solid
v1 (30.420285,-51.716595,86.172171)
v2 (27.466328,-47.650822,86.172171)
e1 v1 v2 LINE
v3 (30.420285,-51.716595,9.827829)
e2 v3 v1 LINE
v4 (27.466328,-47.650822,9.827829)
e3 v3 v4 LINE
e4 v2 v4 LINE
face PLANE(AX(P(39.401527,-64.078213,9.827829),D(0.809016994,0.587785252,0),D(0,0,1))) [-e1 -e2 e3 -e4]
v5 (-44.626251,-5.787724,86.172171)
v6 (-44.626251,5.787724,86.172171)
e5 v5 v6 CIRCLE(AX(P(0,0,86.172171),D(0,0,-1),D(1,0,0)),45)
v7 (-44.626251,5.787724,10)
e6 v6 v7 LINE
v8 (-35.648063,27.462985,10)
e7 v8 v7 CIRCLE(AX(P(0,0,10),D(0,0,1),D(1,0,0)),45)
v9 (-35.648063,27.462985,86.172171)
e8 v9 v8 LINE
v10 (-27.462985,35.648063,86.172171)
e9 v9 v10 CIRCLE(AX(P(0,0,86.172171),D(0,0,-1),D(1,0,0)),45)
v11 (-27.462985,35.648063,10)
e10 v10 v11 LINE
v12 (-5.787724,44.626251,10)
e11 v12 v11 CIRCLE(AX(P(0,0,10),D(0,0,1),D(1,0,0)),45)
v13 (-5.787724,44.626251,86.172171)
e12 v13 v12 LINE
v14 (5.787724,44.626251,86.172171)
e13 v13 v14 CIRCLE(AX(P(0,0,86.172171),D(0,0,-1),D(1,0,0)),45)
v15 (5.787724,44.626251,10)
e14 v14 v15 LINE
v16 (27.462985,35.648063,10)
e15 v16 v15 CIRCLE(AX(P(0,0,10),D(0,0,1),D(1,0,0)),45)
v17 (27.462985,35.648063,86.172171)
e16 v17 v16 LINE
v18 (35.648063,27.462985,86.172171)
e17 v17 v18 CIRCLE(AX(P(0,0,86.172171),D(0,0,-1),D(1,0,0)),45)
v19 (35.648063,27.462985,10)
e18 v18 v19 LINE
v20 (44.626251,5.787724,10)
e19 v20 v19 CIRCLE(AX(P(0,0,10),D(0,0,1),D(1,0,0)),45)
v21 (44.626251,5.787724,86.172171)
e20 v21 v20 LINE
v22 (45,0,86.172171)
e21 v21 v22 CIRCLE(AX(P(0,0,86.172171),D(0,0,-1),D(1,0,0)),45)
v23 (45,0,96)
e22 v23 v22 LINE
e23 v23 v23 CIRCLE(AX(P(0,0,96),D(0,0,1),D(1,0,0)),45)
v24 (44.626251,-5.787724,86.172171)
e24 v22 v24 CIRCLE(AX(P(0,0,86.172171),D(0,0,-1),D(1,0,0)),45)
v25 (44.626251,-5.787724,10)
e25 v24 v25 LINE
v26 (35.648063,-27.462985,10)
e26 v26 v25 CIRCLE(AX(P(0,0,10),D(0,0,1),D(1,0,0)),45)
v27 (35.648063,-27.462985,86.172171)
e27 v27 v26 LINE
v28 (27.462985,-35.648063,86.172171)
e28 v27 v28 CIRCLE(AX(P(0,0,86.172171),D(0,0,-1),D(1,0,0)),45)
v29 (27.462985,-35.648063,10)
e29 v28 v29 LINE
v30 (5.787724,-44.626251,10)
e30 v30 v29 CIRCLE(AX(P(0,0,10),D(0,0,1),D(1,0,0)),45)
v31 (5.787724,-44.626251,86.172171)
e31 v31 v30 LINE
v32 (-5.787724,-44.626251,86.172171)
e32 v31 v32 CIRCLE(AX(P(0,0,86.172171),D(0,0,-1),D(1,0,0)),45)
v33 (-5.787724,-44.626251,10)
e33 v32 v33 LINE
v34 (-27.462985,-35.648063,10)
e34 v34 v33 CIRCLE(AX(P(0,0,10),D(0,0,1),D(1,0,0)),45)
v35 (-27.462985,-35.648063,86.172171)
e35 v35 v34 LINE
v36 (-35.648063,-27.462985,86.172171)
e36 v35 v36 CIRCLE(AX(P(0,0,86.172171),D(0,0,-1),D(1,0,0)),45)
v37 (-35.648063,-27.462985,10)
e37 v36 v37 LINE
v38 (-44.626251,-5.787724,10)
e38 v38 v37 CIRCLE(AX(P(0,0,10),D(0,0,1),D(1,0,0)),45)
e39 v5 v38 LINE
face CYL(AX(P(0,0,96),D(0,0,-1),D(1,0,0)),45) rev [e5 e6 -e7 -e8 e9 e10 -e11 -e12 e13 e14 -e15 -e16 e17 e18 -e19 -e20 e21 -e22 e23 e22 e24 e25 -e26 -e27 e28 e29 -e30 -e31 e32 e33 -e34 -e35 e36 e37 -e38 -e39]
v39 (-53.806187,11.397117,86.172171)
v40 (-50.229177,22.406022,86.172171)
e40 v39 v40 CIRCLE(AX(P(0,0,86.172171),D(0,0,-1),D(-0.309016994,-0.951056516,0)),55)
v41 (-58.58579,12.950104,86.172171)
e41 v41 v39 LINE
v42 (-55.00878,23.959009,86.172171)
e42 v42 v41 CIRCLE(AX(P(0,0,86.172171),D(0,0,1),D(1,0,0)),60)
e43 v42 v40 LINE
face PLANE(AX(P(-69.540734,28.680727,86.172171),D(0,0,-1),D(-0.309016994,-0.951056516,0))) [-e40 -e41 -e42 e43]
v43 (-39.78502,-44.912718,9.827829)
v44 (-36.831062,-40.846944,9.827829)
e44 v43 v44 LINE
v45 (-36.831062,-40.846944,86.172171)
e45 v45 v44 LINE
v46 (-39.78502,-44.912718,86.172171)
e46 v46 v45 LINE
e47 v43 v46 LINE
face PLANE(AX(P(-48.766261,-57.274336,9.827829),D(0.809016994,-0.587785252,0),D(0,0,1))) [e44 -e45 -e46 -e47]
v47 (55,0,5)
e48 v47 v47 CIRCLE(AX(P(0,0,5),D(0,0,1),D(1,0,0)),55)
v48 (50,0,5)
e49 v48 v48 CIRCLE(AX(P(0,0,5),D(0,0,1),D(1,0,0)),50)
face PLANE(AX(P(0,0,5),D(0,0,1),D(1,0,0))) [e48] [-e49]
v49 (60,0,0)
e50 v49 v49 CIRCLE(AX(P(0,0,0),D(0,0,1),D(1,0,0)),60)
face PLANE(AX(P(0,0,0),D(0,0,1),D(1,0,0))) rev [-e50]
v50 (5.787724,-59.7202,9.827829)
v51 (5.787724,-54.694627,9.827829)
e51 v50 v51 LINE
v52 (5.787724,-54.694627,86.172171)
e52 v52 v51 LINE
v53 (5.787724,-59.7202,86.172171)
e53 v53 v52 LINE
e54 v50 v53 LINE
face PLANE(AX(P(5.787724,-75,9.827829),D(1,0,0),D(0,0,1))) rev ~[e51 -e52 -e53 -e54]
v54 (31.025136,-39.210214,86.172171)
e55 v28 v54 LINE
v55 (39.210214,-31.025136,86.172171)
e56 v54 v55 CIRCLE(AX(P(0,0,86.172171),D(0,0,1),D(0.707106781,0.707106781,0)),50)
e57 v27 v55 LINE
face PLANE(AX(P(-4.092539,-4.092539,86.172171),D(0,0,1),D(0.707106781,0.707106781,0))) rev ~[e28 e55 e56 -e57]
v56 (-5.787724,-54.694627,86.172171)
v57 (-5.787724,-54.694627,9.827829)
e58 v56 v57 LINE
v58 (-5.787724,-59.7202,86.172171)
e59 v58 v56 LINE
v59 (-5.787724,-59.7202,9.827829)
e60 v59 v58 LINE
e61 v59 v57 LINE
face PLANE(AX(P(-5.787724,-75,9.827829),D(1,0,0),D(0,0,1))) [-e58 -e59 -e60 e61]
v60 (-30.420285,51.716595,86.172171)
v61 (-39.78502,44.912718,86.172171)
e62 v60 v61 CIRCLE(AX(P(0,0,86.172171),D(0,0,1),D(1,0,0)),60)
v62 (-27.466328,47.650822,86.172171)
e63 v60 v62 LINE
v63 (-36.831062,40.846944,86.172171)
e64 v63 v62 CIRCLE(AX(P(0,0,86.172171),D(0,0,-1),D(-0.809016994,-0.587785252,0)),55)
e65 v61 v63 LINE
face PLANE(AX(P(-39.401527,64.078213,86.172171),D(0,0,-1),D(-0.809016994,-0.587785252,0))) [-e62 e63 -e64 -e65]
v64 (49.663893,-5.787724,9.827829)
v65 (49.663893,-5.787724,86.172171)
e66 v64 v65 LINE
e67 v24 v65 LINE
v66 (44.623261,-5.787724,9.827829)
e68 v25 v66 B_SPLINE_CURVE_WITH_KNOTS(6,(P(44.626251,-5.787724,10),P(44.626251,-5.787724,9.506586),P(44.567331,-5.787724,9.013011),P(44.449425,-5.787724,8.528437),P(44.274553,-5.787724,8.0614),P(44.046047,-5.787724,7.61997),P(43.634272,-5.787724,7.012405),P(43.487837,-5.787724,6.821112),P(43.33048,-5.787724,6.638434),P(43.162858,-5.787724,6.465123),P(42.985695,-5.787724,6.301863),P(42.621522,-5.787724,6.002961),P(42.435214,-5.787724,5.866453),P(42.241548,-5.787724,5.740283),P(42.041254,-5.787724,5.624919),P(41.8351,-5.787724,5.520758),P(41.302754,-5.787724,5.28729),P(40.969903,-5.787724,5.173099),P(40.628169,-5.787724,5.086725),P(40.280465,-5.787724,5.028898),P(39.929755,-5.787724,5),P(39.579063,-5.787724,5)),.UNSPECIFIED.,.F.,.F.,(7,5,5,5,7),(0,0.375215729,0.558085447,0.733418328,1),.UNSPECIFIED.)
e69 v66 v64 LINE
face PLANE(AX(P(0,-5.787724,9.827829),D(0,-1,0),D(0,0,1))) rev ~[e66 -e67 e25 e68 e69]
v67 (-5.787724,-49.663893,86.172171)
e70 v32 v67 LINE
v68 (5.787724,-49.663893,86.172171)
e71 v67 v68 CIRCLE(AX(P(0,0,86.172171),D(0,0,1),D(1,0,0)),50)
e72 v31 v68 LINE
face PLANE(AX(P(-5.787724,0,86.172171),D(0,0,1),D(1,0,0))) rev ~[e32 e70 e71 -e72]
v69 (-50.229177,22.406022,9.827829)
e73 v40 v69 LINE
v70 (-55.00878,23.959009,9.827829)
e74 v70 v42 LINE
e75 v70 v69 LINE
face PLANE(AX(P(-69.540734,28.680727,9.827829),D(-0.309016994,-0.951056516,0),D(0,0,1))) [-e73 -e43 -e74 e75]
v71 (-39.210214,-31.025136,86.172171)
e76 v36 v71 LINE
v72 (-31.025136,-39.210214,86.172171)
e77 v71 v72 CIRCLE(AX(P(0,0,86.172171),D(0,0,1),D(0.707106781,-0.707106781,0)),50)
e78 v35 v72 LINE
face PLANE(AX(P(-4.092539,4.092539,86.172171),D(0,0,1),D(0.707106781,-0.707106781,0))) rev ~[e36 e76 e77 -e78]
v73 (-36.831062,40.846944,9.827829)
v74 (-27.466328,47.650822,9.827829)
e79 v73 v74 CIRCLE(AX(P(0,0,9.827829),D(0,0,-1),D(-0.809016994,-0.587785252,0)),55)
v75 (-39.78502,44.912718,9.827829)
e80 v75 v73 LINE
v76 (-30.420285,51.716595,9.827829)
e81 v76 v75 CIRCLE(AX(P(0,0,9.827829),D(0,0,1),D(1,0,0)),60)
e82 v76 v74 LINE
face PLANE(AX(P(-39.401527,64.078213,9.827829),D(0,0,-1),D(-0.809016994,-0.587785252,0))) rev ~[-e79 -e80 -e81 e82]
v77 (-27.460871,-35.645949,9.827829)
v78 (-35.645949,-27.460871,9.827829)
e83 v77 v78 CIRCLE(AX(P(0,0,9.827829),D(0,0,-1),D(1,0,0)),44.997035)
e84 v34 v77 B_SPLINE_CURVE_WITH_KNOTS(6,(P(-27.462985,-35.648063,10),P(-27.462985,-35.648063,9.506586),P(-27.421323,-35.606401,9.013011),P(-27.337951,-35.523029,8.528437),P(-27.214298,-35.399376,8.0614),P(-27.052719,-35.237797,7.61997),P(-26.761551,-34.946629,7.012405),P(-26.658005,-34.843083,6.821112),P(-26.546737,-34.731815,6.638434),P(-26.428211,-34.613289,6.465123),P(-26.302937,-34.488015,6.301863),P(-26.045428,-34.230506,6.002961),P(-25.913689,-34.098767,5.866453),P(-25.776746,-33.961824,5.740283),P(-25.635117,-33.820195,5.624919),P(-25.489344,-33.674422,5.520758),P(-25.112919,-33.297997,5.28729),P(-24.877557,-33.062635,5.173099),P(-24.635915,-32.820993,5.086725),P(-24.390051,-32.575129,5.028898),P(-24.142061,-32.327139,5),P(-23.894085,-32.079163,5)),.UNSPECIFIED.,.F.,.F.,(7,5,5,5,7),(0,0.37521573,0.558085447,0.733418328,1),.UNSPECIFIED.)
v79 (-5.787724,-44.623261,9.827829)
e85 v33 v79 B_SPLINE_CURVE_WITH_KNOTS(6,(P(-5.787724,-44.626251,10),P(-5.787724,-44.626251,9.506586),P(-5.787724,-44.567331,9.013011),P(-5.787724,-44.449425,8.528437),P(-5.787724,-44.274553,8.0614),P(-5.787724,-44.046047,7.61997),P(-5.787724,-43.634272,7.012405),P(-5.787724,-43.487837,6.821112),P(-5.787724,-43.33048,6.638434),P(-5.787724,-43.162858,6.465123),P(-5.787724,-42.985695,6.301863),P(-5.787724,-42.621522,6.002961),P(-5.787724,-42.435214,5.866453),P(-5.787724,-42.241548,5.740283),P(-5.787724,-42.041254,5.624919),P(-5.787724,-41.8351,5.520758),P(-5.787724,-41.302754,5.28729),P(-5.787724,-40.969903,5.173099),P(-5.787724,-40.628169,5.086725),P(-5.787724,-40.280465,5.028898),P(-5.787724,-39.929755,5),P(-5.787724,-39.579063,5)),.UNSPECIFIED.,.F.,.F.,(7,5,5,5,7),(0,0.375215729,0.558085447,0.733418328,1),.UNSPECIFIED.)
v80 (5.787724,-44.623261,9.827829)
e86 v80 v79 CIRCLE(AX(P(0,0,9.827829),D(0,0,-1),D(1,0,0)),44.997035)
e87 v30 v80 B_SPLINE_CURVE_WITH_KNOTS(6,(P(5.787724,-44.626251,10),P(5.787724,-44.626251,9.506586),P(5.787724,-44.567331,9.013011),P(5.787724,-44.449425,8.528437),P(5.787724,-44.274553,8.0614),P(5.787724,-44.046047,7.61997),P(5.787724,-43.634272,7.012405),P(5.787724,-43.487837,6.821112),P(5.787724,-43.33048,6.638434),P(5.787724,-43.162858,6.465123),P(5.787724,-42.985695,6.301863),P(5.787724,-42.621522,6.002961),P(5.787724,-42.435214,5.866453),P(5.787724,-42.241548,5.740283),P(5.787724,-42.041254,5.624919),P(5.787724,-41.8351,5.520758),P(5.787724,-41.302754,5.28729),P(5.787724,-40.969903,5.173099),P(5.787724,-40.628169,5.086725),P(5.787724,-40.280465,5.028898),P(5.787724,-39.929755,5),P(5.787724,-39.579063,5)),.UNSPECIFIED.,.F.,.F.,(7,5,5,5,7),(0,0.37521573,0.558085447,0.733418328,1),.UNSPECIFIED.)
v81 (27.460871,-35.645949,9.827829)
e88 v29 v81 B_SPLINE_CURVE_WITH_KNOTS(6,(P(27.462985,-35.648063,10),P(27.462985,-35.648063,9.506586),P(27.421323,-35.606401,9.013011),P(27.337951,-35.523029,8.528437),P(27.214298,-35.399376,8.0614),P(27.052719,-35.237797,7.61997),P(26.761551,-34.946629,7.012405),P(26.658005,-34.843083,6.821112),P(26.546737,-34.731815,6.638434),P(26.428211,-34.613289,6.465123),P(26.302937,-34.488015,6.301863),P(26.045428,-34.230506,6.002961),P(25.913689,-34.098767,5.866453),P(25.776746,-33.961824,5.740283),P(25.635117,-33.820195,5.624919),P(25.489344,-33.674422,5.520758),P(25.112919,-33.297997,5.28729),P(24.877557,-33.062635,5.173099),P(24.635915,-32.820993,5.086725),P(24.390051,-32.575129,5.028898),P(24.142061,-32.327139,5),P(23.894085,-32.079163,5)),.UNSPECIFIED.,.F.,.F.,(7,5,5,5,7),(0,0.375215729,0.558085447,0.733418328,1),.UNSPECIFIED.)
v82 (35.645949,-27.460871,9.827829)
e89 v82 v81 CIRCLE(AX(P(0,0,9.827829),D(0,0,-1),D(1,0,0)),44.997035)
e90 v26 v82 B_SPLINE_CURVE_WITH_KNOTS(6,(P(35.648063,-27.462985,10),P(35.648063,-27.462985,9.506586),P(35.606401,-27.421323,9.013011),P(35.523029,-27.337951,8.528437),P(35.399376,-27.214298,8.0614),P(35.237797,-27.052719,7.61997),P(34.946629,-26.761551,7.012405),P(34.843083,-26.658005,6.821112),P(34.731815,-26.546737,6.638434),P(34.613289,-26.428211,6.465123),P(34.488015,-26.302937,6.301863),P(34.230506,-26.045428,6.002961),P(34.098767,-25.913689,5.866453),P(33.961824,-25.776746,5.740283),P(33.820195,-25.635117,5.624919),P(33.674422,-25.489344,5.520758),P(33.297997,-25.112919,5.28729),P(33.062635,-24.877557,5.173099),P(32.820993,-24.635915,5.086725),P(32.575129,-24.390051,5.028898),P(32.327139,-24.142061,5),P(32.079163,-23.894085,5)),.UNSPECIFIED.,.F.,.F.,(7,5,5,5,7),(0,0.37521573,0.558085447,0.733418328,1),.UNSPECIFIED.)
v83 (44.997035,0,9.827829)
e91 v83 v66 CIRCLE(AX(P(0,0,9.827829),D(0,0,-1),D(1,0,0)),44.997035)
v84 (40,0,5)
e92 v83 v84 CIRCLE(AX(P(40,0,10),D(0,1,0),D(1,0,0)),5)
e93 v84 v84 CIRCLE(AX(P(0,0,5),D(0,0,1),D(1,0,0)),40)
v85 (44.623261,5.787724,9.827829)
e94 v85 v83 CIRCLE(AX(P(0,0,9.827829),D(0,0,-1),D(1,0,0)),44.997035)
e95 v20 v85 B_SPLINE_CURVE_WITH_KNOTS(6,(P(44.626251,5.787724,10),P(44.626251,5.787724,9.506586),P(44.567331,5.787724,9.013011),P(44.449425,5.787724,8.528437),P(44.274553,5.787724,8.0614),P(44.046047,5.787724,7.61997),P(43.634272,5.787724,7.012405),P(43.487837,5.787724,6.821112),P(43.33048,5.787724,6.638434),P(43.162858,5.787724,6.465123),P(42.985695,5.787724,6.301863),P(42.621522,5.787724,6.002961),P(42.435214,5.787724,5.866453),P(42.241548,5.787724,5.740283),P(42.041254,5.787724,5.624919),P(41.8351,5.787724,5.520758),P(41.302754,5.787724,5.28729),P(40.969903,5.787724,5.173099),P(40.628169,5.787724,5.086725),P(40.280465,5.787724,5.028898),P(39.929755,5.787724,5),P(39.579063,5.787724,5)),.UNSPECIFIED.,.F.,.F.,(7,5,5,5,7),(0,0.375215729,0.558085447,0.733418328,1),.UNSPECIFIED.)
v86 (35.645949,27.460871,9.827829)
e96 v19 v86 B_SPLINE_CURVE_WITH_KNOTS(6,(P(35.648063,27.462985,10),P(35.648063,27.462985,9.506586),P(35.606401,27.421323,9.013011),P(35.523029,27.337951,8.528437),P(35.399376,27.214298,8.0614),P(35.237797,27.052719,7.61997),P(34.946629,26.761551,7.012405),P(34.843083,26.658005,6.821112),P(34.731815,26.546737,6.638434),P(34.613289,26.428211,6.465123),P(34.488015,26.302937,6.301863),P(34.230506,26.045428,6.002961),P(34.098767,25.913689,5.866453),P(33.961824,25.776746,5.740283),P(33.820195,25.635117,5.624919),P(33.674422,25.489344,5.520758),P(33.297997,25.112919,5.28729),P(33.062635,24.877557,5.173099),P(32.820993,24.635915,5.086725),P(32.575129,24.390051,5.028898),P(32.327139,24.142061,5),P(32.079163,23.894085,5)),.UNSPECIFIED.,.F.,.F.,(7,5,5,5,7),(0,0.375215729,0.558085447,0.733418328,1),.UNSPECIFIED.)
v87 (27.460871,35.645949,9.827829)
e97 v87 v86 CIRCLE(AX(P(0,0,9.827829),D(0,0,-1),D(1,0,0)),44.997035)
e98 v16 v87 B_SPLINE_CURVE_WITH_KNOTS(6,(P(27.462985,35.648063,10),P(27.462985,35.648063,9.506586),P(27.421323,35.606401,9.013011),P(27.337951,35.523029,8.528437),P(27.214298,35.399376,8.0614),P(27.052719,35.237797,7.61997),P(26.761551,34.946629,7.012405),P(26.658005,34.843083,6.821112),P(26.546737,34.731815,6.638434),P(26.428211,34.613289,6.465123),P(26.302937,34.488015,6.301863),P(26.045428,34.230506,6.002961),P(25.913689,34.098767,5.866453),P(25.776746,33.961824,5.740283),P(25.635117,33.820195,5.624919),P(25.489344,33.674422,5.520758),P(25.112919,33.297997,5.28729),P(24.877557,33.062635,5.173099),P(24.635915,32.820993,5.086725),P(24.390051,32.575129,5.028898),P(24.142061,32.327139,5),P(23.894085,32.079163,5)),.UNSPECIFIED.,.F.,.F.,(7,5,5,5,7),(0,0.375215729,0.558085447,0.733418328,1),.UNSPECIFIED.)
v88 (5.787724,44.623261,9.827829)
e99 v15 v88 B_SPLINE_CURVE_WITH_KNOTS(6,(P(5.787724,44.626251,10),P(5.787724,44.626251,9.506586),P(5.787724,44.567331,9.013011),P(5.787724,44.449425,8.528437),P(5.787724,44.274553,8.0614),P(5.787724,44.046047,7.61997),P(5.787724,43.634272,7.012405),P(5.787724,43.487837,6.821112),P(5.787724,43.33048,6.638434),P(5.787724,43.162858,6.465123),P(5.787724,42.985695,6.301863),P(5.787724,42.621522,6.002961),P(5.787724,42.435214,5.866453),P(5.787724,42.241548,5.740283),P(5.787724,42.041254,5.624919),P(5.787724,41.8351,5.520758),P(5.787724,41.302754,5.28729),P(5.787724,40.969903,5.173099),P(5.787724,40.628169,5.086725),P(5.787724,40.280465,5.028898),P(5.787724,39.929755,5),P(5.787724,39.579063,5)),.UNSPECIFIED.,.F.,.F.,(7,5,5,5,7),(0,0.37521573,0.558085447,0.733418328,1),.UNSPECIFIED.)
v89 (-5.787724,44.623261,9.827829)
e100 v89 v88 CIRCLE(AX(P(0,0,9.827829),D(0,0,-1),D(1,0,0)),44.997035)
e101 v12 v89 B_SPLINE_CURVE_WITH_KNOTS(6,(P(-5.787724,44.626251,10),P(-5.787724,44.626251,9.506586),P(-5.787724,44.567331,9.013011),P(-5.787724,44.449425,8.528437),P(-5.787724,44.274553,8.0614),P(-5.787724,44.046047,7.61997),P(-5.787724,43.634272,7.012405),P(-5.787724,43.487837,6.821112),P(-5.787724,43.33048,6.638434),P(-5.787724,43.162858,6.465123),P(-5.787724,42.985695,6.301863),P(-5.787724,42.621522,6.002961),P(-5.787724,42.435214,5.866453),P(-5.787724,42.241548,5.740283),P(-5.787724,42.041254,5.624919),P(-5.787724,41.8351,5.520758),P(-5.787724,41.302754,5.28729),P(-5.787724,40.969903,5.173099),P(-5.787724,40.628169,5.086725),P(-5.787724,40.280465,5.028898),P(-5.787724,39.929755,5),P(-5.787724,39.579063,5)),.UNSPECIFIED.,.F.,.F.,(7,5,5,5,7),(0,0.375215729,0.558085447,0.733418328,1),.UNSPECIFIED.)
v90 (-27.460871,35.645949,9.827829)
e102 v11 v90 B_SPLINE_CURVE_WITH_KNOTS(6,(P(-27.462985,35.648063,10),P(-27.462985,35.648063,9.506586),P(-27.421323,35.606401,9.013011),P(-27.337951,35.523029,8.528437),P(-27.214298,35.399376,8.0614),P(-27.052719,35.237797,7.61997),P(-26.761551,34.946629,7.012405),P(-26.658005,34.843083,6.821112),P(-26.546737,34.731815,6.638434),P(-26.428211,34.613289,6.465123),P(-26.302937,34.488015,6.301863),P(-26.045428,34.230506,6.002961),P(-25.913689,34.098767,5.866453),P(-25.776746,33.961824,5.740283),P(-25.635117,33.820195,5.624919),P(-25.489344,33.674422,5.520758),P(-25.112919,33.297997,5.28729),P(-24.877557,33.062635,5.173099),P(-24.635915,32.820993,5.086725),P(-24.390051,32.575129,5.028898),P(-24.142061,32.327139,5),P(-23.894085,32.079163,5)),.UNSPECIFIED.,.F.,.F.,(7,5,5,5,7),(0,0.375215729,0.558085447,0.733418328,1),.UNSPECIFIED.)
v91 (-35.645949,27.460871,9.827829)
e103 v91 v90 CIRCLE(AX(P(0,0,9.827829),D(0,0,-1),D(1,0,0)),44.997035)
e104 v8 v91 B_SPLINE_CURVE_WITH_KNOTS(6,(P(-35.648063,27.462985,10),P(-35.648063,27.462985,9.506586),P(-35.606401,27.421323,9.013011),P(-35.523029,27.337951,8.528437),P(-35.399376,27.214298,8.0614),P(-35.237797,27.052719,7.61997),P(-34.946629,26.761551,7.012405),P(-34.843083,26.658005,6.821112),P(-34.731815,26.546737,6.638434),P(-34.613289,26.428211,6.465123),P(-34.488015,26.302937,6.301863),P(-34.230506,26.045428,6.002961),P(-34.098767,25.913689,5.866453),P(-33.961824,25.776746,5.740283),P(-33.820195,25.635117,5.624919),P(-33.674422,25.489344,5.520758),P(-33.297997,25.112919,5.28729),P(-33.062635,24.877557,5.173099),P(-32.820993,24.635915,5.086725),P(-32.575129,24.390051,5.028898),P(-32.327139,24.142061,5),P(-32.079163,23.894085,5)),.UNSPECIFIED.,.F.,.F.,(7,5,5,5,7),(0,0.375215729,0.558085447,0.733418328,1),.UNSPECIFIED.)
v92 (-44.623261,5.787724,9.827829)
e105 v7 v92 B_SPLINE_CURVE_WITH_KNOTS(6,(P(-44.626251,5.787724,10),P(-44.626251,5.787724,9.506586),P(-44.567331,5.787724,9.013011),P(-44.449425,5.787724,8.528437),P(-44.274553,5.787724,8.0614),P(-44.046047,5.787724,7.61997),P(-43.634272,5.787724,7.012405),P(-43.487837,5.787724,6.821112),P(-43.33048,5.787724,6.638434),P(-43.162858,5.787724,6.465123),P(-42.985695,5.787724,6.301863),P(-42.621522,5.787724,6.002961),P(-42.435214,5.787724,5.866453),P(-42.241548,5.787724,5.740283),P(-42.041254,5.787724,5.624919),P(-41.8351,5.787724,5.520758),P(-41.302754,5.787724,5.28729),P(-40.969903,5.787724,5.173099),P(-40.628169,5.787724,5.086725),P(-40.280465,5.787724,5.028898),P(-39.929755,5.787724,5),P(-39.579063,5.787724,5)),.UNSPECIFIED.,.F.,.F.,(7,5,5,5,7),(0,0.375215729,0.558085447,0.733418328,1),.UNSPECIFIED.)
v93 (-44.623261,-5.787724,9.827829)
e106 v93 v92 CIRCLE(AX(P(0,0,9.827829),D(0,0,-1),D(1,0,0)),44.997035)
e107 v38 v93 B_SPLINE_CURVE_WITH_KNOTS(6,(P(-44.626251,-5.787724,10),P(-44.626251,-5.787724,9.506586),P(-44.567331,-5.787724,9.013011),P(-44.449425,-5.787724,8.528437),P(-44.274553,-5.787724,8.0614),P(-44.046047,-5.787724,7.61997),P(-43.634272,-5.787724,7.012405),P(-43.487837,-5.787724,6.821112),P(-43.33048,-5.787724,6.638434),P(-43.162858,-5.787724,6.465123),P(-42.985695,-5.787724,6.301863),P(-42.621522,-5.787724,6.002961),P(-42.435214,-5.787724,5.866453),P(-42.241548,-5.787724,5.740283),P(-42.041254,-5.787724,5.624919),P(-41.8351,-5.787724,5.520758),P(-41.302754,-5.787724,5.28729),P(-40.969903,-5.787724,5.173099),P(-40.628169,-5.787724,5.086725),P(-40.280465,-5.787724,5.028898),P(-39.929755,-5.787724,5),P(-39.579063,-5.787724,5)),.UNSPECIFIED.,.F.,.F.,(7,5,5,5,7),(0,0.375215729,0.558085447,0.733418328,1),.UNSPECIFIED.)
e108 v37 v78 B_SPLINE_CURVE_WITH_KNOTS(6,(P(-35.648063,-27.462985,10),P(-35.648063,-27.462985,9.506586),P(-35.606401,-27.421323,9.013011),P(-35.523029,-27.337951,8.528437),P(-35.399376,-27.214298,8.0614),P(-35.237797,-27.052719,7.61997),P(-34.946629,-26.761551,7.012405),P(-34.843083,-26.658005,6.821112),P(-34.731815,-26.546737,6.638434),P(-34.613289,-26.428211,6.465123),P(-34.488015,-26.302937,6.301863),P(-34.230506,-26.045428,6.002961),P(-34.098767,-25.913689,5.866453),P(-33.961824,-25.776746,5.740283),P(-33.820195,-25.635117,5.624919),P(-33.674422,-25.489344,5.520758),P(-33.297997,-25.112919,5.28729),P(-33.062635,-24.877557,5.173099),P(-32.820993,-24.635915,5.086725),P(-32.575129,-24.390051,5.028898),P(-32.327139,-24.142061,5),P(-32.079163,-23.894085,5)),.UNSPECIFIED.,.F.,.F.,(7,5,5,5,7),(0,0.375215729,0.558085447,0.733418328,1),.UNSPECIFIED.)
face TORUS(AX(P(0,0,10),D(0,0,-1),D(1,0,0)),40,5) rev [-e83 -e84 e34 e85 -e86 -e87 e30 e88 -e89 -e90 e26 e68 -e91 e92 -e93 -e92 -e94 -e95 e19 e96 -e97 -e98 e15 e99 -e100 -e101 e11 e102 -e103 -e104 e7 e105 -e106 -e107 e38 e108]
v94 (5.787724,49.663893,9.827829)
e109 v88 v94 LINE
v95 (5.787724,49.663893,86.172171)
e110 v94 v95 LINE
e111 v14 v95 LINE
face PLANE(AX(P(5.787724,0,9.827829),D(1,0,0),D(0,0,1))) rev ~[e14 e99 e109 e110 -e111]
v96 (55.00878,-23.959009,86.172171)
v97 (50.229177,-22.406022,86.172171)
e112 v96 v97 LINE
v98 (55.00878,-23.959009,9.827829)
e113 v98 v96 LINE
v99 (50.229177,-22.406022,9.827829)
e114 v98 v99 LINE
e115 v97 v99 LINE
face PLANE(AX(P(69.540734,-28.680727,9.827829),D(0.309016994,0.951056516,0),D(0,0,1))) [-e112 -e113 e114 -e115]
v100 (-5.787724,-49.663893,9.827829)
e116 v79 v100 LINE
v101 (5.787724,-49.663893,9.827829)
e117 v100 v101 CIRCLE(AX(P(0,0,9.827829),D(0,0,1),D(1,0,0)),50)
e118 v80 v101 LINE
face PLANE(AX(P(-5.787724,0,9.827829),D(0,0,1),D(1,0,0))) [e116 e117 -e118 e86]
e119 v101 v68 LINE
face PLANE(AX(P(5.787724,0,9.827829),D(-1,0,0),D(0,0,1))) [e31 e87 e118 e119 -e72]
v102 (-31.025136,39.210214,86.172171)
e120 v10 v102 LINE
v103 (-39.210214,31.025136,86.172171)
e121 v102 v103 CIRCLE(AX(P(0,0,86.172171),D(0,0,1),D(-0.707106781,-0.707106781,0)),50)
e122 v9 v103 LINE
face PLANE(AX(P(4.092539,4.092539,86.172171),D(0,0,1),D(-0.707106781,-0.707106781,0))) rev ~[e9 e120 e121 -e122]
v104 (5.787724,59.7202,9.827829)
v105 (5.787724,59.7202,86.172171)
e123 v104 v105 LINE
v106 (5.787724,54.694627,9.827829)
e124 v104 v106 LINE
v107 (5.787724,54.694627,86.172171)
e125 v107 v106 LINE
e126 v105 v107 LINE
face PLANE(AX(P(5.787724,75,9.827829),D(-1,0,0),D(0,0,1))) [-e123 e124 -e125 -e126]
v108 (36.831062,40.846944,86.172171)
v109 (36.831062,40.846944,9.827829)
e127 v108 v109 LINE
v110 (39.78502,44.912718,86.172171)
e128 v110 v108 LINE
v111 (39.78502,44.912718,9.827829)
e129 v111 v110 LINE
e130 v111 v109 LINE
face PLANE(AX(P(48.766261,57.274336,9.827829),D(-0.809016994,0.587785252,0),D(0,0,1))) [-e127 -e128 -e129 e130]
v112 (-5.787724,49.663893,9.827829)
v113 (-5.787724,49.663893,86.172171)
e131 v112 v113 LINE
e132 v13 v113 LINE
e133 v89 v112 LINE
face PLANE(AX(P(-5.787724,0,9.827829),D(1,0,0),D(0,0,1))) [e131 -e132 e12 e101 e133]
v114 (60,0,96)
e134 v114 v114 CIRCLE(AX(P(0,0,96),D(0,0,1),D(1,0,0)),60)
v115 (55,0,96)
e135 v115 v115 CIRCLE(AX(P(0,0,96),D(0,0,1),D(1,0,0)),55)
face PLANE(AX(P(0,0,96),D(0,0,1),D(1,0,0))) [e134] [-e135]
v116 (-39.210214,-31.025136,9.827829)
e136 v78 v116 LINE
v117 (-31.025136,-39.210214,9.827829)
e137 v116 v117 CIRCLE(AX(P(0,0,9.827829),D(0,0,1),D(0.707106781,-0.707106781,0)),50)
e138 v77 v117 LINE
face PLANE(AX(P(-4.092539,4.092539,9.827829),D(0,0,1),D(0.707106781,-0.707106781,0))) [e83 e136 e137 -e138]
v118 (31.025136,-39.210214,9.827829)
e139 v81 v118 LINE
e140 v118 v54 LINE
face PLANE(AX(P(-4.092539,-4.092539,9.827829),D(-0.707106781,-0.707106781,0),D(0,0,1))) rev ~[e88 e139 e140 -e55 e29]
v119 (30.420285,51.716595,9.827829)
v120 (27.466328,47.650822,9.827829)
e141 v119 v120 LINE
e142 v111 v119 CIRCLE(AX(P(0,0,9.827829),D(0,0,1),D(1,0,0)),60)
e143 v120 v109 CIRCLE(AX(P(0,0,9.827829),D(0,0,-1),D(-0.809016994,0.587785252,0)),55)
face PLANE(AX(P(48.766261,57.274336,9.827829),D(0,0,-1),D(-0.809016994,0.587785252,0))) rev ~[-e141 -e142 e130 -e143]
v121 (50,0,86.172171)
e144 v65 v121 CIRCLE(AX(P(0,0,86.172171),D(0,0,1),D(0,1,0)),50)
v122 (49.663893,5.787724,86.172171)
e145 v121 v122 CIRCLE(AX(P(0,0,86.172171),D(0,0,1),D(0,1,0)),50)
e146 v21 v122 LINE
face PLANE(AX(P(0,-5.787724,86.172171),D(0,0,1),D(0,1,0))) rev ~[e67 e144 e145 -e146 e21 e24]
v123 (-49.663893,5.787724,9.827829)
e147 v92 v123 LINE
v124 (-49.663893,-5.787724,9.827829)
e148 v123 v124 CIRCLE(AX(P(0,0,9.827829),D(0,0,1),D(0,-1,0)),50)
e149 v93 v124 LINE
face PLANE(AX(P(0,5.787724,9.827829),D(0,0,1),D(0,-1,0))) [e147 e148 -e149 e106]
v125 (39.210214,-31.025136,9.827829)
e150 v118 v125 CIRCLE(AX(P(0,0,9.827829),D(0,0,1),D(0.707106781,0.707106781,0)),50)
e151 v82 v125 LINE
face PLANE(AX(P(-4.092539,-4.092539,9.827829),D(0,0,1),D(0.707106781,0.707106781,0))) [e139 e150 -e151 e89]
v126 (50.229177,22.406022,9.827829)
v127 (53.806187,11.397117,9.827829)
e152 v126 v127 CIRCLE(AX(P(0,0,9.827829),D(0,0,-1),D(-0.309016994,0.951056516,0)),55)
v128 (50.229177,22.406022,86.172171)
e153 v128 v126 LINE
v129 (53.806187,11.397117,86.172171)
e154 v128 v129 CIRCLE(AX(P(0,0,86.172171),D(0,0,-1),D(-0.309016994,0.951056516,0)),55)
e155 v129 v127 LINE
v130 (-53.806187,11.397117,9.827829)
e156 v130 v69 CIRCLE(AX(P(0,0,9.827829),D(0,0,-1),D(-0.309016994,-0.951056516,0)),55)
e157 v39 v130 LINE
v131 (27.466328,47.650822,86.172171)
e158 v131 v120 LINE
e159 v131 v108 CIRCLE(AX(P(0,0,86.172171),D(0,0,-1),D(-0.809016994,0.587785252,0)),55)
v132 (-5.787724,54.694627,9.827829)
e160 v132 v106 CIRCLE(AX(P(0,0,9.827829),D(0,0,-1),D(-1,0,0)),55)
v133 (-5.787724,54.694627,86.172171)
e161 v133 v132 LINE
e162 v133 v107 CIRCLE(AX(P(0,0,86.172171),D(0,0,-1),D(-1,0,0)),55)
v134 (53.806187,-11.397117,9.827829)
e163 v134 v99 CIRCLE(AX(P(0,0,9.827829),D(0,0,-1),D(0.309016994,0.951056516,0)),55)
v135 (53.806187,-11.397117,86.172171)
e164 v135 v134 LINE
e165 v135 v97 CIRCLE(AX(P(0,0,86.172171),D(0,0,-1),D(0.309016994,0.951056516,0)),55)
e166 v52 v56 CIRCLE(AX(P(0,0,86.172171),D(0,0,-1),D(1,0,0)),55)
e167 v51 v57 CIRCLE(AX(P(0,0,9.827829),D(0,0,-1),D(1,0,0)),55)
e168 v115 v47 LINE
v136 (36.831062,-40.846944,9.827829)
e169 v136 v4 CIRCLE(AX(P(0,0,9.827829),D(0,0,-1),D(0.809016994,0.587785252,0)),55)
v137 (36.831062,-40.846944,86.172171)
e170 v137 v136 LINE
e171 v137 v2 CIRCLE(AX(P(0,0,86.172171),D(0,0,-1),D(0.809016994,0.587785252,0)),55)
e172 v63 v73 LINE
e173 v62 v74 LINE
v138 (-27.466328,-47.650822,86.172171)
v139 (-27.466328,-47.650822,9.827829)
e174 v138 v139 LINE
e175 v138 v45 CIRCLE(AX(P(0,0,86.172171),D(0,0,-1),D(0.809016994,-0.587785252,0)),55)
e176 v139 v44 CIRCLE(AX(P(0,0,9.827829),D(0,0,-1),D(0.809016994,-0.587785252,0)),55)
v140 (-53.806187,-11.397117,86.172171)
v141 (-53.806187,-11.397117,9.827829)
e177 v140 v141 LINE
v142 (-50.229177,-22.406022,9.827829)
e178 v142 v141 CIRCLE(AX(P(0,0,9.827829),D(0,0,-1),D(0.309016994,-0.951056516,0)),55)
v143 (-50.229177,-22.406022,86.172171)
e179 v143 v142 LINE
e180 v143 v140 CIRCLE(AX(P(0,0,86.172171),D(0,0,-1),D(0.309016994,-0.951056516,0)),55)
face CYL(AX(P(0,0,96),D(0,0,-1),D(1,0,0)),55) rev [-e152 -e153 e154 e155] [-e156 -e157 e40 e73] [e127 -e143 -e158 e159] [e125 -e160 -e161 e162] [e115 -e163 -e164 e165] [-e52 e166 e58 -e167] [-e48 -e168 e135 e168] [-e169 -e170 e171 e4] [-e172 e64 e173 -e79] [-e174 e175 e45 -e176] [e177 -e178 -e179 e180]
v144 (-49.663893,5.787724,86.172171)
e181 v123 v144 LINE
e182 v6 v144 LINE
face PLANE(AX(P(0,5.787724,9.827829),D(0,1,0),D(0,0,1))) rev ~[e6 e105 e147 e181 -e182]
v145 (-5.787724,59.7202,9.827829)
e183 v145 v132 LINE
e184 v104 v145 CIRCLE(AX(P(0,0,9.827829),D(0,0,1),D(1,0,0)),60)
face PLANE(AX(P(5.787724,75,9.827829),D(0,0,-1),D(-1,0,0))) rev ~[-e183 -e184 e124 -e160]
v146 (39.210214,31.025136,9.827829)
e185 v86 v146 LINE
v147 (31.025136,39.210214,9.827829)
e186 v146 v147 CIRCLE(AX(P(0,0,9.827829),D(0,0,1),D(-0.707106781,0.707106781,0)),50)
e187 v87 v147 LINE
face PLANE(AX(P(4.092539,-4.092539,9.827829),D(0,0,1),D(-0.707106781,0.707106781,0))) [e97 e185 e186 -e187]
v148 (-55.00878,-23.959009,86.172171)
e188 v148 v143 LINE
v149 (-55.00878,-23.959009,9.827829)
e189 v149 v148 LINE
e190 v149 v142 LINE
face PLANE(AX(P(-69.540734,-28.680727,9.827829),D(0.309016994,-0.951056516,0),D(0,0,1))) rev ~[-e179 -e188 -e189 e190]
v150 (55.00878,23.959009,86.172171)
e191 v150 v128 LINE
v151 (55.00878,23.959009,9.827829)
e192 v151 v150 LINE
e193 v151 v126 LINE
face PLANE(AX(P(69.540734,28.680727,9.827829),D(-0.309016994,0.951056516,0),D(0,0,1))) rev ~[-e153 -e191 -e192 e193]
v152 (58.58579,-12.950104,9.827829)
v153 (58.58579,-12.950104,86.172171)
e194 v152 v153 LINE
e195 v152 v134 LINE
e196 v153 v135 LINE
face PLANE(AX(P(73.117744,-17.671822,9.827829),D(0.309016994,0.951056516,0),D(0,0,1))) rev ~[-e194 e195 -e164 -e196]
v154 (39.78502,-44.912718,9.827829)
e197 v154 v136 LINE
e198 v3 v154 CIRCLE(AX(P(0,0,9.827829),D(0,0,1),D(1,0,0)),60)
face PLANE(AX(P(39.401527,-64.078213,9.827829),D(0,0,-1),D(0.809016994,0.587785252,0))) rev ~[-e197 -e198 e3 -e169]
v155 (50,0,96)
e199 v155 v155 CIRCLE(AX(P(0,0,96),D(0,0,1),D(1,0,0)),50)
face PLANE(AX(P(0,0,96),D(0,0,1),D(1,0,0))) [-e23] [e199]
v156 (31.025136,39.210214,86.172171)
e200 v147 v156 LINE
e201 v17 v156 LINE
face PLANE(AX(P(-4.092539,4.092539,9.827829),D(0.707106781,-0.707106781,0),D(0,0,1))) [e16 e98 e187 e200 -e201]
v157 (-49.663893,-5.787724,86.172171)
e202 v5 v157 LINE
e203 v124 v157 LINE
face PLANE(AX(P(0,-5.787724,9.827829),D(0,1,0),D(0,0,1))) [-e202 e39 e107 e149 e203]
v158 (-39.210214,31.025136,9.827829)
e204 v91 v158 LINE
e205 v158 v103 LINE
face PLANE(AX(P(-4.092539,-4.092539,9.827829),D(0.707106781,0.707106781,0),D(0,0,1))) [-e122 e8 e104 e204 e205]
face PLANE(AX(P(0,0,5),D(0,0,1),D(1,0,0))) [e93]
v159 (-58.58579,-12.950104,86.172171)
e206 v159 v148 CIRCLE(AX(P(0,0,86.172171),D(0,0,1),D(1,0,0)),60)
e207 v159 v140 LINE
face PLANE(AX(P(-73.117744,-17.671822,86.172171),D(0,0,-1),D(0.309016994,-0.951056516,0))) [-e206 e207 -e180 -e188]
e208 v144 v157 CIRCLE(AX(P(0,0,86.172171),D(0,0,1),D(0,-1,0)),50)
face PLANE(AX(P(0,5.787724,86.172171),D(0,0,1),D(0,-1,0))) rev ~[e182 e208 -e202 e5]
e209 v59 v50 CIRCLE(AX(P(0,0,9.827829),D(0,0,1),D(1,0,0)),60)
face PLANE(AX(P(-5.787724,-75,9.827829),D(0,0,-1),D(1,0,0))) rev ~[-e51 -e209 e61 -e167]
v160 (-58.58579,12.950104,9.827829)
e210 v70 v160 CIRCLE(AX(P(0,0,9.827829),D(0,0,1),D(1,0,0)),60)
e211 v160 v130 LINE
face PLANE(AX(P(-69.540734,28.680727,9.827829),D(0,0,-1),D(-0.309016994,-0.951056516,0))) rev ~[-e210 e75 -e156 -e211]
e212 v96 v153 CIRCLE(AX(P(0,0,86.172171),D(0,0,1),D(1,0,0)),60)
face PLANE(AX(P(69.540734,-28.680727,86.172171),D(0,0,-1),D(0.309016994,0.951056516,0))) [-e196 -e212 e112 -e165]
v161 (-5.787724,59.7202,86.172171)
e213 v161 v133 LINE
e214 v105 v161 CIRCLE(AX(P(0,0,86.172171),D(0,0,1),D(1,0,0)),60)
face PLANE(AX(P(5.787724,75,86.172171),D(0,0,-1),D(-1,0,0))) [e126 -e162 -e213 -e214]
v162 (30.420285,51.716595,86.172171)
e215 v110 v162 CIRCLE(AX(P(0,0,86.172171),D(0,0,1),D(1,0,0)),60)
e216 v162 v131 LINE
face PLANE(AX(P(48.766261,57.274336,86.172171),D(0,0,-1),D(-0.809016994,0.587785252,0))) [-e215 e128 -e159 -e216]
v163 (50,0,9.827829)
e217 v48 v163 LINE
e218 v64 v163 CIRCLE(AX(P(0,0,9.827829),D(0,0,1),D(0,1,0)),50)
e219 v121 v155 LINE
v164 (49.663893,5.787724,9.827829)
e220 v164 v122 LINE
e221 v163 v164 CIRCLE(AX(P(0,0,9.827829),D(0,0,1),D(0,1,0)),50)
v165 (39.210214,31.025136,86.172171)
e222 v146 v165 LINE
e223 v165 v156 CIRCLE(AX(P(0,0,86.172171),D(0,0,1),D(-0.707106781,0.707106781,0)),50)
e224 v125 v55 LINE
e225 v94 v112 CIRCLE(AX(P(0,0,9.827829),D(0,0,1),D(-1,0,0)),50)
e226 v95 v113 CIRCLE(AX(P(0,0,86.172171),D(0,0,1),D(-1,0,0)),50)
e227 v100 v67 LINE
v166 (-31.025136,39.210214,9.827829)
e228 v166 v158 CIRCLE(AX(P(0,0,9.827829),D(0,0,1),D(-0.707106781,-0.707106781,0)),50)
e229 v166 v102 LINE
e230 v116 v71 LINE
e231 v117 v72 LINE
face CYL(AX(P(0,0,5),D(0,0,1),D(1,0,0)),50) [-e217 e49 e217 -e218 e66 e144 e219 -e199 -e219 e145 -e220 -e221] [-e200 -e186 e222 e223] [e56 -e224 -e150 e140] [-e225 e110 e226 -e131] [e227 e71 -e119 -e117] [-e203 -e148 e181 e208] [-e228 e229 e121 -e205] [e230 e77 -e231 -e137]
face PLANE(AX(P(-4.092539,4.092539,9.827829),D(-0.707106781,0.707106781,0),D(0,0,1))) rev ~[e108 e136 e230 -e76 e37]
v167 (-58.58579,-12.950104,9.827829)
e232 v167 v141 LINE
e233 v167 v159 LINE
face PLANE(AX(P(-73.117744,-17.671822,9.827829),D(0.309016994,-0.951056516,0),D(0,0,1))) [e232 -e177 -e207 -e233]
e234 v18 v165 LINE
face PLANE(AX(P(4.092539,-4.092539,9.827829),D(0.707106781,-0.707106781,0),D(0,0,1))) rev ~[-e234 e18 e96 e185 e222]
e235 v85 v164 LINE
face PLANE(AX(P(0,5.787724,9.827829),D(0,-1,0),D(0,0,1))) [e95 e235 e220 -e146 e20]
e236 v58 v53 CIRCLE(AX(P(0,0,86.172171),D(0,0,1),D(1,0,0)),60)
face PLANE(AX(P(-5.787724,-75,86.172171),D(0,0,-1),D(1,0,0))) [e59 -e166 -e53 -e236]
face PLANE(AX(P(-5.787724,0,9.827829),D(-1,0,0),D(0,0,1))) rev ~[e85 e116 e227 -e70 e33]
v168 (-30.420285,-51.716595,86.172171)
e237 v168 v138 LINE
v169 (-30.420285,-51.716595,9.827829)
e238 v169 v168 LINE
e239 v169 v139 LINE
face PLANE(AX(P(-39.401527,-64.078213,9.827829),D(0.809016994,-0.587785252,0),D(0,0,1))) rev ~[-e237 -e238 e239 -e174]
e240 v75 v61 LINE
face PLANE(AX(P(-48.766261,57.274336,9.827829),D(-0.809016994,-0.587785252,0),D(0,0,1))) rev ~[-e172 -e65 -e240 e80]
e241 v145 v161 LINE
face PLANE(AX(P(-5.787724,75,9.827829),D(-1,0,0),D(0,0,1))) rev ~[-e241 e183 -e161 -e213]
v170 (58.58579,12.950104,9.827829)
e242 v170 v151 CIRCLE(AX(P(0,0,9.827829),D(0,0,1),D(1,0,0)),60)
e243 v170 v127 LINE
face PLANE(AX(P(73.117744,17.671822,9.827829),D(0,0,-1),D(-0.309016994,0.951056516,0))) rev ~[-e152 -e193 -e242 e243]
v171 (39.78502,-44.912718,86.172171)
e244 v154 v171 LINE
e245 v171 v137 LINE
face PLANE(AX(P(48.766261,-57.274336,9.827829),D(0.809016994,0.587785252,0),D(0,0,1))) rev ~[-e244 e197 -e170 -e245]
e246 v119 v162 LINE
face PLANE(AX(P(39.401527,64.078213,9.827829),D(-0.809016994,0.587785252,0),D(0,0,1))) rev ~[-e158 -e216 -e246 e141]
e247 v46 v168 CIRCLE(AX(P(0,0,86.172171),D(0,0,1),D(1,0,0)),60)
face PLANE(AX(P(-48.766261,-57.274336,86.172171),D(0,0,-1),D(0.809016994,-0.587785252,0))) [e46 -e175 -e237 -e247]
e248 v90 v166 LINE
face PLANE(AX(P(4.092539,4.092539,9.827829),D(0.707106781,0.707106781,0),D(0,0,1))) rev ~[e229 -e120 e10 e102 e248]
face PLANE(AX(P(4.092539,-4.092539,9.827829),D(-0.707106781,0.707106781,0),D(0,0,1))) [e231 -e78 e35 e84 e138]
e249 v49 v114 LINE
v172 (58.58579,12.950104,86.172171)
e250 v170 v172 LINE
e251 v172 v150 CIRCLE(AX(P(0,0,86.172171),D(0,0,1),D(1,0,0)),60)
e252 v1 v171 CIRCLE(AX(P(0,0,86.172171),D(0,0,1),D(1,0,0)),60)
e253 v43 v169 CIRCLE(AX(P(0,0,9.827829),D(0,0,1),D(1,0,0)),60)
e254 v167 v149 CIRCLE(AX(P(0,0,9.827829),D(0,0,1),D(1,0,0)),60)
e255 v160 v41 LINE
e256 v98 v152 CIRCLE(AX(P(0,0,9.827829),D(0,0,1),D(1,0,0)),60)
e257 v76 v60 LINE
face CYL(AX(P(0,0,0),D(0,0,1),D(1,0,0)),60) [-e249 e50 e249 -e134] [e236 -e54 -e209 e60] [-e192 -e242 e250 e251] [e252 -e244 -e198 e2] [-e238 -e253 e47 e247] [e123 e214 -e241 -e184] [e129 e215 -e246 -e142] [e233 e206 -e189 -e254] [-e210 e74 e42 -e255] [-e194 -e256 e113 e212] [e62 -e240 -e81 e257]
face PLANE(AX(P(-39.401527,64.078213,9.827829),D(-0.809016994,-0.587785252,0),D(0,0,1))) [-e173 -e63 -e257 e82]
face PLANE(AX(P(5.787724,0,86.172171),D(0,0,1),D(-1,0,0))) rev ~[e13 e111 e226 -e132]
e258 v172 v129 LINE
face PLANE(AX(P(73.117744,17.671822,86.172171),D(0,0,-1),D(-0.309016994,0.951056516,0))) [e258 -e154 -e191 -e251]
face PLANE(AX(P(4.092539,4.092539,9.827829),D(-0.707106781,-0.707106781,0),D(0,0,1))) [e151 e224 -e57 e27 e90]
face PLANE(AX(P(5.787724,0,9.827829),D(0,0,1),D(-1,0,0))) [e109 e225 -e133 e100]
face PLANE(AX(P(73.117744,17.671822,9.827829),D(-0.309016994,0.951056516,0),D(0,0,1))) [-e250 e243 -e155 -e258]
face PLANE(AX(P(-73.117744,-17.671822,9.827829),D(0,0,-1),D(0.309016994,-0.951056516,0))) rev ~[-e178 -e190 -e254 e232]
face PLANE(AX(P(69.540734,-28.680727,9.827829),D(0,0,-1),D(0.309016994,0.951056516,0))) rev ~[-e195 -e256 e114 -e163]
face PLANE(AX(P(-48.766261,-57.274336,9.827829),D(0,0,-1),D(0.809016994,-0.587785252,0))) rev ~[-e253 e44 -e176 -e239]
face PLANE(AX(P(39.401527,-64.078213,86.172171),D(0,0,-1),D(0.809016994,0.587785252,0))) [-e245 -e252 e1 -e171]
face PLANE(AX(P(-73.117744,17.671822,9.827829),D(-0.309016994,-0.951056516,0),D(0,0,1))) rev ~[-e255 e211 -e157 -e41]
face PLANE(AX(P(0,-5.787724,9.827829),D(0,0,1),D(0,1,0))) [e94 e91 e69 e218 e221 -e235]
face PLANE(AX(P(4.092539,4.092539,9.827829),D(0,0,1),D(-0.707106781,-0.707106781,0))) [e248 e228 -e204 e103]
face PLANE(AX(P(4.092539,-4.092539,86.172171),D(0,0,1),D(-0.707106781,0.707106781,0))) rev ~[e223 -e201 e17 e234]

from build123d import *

# Parameters (mm, degrees)
F2_W            = 11.5754483268
F2_H            = 76.3443418741
F3_REACH        = 137.2178993172
F3_COPIES_COUNT = 8
F5_W            = 11.5754483268
F5_H            = 76.3443418741
F6_REACH        = 212.2178993172
F6_COPIES_COUNT = 10


# Not quite as in the source:
# - a pattern or mirror of a feature is missing from the dataset's text; its kind, count and spacing are read off the source's solid


with BuildPart() as f1:
    # F0 (on Front) → F1 (revolve)
    with BuildSketch(Plane.XZ):
        with BuildLine():
            Line((0, 5), (0, 0))
            Line((0, 0), (60, 0))
            Line((60, 0), (60, 96))
            Line((60, 96), (55, 96))
            Line((55, 96), (55, 5))
            Line((55, 5), (50, 5))
            Line((50, 5), (50, 96))
            Line((50, 96), (45, 96))
            Line((45, 96), (45, 10))
            ThreePointArc((45, 10), (43.5355339059, 6.4644660941), (40, 5))
            Line((40, 5), (0, 5))
        make_face()
    revolve(axis=Axis((0, 0, 2.5), (0, 0, 1)))

    f3_end = f1.faces().sort_by_distance((-50, 0, 50.5))[0]
    # F2 (on Front) → F3 (cut, up to a face of the model that its end follows)
    with BuildSketch(Plane.XZ):
        with Locations((0, 48)):
            Rectangle(F2_W, F2_H)
    f3_long = extrude(amount=F3_REACH, mode=Mode.PRIVATE)
    f3 = split(f3_long, bisect_by=f3_end, keep=Keep.BOTTOM, mode=Mode.PRIVATE)
    add(f3, mode=Mode.SUBTRACT)

    # F3_copies: F3 ×8 about axis
    f3_copies_axis = Axis((0, 0, 0), (0, 0, 1))
    for i in range(1, F3_COPIES_COUNT):
        add(f3.rotate(f3_copies_axis, i * 360 / F3_COPIES_COUNT), mode=Mode.SUBTRACT)

    f6_end = f1.faces().sort_by_distance((-55, 0, 50.5))[0]
    # F5 (on offset) → F6 (cut, up to a face of the model that its end follows)
    with BuildSketch(Plane.XZ.offset(75)):
        with Locations((0, 48)):
            Rectangle(F5_W, F5_H)
    f6_long = extrude(amount=-F6_REACH, mode=Mode.PRIVATE)
    f6 = split(f6_long, bisect_by=f6_end, keep=Keep.ALL, mode=Mode.PRIVATE).solids().sort_by_distance((0, -75, 48))[0]
    add(f6, mode=Mode.SUBTRACT)

    # F6_copies: F6 ×10 about axis
    f6_copies_axis = Axis((0, 0, 0), (0, 0, 1))
    for i in range(1, F6_COPIES_COUNT):
        add(f6.rotate(f6_copies_axis, i * 360 / F6_COPIES_COUNT), mode=Mode.SUBTRACT)


solid = f1.part
